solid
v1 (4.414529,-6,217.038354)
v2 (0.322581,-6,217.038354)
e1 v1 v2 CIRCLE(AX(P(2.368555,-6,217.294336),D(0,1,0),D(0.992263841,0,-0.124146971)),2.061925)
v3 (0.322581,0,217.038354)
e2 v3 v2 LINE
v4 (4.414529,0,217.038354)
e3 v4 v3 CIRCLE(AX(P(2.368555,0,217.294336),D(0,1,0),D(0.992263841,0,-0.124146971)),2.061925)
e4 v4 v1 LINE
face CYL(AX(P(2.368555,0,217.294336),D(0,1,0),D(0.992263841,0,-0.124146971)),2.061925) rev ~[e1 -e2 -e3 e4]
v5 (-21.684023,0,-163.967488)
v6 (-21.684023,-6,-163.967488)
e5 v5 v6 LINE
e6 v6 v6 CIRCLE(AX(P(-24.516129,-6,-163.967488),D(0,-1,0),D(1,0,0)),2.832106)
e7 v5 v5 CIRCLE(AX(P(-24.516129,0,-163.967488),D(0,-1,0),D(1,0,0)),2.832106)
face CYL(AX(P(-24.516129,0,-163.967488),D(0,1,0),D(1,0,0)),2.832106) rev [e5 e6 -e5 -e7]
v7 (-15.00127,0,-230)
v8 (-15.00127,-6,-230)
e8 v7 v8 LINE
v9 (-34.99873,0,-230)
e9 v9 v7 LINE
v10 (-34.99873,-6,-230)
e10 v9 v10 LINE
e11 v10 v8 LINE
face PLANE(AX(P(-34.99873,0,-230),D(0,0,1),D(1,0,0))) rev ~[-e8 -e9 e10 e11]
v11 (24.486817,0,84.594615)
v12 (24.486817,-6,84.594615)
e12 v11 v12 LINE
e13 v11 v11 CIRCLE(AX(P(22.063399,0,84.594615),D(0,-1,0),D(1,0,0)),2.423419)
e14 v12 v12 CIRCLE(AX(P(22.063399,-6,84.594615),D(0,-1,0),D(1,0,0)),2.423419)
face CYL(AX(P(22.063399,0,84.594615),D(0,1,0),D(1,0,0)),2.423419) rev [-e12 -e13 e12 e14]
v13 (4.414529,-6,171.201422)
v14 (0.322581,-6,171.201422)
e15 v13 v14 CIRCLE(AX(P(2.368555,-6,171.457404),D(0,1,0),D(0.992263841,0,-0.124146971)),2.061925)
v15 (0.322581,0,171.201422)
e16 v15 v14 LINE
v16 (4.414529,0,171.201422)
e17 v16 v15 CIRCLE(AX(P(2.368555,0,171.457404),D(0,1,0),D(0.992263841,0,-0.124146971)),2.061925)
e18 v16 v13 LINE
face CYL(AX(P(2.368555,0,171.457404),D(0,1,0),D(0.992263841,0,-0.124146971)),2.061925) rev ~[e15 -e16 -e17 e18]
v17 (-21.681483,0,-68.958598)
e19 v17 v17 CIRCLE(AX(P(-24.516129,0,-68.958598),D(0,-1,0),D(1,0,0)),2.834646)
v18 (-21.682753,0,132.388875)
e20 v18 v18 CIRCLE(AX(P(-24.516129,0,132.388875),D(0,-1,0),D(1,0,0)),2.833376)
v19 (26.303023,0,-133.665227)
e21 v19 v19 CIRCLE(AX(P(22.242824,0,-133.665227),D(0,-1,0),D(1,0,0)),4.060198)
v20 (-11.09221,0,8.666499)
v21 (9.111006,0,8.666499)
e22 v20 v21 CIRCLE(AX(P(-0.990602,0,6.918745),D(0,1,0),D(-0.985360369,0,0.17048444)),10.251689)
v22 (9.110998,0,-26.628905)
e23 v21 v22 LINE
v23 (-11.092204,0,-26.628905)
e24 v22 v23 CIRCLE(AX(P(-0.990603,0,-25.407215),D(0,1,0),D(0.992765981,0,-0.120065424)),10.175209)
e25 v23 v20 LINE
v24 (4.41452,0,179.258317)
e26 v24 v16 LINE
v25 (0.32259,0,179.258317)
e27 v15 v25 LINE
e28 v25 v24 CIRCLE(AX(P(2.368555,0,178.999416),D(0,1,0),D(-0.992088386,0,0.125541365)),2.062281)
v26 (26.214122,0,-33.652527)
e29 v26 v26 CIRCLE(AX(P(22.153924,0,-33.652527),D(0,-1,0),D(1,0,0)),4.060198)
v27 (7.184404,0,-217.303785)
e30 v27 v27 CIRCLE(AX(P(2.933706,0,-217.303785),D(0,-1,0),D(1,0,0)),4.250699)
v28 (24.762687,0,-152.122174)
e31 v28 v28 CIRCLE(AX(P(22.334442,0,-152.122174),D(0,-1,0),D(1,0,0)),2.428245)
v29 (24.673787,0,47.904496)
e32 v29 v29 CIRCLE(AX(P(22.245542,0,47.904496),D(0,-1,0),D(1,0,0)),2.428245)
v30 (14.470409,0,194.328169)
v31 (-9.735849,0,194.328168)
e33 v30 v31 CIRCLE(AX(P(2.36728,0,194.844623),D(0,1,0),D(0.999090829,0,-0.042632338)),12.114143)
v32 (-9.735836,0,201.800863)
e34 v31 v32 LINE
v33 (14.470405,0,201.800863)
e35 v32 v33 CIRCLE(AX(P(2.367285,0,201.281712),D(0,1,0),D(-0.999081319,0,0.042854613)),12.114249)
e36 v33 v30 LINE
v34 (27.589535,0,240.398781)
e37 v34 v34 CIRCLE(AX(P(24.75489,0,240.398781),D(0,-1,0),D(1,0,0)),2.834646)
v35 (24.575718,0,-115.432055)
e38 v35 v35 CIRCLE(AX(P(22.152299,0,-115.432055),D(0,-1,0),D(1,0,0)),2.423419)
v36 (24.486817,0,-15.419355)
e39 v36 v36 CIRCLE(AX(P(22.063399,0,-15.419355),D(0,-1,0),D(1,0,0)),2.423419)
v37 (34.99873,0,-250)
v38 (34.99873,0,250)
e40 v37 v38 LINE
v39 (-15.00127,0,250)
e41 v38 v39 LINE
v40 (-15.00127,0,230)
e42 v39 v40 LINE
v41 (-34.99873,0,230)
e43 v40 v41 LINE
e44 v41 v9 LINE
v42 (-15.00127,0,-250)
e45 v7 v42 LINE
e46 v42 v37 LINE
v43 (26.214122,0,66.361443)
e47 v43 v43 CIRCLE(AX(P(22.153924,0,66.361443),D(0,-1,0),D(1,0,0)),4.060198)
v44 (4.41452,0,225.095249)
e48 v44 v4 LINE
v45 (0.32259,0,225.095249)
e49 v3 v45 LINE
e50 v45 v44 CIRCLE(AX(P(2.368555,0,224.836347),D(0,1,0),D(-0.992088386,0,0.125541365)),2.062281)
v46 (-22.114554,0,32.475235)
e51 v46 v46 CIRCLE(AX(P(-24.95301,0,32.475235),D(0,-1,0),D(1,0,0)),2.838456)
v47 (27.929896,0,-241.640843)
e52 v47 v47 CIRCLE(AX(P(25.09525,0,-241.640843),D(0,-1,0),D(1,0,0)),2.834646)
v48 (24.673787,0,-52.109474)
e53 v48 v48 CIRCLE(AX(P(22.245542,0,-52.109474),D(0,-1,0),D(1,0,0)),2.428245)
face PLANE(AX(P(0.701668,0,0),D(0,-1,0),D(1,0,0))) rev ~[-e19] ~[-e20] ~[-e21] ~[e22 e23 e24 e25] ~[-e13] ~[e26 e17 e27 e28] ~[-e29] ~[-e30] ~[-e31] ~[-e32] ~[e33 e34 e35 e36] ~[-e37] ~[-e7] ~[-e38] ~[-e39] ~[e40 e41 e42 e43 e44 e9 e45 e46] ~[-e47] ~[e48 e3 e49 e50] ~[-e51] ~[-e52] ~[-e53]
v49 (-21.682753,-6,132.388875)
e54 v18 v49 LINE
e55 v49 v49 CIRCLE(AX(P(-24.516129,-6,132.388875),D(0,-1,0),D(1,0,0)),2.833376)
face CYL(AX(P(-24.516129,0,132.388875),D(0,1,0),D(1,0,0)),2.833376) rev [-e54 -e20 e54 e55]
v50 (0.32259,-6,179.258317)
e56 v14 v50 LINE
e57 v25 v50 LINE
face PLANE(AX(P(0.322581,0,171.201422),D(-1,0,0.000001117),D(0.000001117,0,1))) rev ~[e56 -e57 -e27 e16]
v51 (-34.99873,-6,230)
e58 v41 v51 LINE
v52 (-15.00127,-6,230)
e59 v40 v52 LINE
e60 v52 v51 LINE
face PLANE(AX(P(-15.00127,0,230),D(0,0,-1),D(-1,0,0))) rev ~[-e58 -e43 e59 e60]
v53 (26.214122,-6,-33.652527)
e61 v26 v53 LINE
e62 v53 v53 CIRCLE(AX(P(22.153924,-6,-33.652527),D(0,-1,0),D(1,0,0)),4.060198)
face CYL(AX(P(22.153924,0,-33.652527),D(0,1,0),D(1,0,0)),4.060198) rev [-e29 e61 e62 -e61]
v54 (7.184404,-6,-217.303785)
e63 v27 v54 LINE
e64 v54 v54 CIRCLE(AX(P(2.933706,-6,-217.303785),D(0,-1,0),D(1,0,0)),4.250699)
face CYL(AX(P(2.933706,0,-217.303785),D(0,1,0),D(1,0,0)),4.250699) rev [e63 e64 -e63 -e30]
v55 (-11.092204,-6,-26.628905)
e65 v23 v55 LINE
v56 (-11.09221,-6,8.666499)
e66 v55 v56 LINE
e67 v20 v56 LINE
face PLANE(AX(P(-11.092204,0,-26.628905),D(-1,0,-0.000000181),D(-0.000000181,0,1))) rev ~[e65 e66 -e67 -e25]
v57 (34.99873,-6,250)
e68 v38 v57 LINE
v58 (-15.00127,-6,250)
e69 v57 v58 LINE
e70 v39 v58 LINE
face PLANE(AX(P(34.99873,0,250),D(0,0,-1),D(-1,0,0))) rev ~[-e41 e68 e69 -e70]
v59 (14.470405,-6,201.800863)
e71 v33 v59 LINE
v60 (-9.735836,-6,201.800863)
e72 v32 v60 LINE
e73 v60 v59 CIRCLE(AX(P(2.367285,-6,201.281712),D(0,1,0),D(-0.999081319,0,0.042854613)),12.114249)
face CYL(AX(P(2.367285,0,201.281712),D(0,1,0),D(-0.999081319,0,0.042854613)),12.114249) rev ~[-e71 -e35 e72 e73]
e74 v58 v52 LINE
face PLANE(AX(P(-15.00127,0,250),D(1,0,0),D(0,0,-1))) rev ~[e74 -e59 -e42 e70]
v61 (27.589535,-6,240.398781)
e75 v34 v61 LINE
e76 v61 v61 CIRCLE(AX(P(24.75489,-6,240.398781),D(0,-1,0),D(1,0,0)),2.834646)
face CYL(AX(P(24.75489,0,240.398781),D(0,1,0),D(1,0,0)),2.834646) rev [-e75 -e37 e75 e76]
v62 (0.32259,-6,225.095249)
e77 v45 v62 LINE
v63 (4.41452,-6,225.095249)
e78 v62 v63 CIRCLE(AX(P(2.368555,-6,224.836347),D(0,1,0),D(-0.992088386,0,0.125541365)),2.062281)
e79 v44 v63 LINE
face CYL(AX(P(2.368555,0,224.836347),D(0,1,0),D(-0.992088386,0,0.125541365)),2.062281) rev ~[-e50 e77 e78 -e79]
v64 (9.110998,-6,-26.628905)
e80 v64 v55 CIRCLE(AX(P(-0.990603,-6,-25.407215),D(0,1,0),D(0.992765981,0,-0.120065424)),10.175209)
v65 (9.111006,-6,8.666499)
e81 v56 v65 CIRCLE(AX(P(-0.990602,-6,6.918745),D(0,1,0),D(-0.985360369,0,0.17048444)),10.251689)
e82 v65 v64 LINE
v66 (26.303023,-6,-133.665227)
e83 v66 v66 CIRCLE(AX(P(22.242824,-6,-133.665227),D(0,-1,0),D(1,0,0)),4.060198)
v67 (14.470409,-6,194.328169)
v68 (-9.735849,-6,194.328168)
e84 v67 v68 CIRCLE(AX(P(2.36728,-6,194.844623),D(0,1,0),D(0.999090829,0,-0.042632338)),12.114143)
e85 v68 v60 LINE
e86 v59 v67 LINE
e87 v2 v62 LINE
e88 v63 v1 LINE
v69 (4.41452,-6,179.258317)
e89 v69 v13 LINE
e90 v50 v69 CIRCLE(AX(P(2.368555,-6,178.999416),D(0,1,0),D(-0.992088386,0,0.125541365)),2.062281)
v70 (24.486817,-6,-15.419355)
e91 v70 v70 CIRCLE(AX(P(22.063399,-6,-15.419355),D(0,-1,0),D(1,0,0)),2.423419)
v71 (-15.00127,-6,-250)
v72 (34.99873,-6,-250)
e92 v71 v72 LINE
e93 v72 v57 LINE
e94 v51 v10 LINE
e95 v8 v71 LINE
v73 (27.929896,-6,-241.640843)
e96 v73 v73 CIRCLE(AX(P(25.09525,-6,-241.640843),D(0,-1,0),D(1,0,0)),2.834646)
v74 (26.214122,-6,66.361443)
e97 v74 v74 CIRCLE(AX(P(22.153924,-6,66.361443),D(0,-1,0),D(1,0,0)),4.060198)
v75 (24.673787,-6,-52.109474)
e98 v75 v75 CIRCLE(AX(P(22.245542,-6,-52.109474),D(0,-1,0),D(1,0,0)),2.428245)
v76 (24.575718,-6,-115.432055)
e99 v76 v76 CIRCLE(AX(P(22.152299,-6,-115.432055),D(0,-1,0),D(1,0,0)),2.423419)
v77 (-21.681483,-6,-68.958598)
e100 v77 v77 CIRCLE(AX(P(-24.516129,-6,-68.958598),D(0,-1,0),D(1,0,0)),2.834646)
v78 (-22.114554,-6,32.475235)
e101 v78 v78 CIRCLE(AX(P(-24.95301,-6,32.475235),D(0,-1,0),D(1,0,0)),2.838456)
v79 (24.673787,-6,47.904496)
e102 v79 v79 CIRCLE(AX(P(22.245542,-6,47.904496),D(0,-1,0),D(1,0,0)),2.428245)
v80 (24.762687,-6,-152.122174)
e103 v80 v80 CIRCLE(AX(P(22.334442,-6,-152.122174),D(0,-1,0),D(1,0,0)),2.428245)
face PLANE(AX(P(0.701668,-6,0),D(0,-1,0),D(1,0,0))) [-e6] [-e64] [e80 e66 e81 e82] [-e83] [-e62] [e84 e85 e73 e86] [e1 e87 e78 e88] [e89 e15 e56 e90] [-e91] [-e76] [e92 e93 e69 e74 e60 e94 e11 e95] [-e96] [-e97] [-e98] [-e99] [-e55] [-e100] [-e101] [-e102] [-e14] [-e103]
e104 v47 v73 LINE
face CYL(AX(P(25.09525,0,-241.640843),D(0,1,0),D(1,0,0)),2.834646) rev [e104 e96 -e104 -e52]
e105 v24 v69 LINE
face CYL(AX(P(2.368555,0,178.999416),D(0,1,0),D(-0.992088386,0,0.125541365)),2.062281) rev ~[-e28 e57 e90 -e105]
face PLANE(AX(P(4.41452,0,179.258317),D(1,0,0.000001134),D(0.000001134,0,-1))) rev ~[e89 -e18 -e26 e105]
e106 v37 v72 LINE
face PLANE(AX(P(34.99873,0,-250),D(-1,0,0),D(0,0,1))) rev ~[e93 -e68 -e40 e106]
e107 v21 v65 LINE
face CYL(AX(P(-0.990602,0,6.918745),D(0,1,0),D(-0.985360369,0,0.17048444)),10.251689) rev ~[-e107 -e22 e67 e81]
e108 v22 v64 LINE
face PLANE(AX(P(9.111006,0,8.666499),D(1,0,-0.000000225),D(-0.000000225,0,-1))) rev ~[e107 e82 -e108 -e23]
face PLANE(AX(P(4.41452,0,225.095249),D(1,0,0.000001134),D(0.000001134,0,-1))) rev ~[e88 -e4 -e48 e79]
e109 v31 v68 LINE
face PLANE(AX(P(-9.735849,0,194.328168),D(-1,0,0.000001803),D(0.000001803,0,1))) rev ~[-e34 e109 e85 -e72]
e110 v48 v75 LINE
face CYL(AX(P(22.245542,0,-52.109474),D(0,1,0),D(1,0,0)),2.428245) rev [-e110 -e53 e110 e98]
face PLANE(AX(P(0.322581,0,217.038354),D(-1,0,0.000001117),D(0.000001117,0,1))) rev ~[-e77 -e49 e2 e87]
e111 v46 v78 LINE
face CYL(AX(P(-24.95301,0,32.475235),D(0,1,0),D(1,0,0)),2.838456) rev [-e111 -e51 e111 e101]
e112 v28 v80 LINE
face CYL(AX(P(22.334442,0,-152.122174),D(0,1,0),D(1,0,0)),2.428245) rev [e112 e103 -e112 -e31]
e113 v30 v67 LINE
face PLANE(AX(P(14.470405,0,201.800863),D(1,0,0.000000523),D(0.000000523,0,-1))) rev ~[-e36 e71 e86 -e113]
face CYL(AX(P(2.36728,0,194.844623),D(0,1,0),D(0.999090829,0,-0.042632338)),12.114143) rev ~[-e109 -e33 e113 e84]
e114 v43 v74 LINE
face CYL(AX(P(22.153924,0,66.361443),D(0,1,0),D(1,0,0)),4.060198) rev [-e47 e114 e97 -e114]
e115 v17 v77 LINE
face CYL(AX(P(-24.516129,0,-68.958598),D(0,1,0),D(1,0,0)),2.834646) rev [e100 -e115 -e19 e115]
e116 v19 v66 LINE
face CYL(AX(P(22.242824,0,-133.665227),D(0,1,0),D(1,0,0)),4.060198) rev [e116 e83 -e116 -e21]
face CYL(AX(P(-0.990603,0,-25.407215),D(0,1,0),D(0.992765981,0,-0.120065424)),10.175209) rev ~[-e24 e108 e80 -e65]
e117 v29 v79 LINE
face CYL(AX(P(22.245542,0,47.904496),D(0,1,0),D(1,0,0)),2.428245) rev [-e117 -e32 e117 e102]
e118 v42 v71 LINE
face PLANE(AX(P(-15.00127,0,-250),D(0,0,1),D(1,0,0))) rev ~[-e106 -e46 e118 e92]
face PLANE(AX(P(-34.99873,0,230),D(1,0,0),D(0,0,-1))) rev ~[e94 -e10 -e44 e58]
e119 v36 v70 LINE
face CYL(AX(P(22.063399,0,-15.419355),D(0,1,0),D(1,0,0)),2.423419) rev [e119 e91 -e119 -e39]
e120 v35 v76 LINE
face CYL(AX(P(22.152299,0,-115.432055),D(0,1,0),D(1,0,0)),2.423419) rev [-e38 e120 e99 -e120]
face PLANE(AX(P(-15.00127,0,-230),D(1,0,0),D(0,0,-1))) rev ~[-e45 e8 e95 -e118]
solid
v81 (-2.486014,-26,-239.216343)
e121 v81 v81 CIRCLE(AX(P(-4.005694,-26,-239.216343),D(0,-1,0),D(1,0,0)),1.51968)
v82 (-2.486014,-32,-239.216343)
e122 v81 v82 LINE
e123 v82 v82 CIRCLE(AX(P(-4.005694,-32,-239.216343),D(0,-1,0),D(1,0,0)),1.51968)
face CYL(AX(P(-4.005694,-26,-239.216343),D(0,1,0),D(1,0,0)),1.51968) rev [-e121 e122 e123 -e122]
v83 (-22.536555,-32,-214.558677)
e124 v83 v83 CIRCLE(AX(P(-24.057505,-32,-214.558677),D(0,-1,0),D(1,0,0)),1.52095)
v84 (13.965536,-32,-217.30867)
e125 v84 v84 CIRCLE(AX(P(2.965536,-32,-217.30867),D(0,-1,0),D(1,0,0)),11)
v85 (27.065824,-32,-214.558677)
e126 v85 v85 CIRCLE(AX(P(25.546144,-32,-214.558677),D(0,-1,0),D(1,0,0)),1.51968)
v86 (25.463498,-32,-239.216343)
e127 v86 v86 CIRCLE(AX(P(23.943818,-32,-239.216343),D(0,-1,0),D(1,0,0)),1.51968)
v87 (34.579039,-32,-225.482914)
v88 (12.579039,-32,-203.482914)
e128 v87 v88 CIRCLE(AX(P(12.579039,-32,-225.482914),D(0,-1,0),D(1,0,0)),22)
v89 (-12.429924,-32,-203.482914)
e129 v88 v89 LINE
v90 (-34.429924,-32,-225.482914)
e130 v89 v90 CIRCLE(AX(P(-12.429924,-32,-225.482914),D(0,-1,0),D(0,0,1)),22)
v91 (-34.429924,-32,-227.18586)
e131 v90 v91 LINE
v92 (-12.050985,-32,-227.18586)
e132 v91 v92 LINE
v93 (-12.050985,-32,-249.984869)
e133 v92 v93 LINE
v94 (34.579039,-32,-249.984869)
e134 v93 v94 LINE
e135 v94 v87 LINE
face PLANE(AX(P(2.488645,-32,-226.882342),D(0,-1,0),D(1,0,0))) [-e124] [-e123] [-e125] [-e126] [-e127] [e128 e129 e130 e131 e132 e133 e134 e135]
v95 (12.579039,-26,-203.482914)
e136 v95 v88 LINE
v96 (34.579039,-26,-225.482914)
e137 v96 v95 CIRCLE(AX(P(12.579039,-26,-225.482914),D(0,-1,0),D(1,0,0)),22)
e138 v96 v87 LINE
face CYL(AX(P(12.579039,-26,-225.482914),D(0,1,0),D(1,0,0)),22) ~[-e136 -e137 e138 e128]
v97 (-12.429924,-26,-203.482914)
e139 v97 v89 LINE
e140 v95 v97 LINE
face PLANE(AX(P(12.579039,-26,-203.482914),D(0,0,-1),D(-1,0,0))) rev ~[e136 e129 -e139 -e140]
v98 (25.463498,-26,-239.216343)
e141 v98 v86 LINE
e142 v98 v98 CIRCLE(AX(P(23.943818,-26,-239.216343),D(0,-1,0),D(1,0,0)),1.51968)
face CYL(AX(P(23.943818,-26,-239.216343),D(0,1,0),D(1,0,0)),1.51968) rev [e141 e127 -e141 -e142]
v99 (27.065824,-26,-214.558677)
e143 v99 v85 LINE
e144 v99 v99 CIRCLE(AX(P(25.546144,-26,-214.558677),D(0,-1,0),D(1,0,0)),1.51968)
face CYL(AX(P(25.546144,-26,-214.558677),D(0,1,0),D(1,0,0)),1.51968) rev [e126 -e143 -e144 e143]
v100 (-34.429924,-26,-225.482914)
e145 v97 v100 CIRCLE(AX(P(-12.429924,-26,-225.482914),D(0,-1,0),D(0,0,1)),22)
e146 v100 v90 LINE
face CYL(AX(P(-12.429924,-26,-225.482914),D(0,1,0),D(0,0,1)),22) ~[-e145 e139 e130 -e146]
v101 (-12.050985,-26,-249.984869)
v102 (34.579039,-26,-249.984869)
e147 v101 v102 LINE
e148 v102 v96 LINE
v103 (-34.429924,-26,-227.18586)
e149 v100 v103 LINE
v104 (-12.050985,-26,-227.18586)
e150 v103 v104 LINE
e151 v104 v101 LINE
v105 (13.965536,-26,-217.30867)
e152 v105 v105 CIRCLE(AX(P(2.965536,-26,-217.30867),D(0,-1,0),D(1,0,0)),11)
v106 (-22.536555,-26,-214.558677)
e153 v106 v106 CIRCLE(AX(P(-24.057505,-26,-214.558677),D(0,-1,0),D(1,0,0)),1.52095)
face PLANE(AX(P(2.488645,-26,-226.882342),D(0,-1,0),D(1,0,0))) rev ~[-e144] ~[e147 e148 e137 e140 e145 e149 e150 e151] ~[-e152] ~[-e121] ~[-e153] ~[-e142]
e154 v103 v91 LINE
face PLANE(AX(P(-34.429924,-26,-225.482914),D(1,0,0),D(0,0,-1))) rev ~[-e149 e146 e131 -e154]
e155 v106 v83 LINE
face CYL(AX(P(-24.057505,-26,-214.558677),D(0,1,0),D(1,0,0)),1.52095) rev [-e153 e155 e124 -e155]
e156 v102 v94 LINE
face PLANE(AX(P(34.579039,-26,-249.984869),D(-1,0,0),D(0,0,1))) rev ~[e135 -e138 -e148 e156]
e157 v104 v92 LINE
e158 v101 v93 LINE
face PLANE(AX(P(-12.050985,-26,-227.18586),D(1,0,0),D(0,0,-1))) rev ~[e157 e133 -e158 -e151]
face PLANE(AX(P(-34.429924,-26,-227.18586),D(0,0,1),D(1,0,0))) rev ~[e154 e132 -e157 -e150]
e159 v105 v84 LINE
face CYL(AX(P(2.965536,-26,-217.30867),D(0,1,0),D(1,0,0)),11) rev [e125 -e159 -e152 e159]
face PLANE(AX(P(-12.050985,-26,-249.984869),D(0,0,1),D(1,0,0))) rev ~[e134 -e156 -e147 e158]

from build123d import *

# Parameters (mm, degrees)
F0_R     = 2.8321056642
F0_R_2   = 2.8346456693
F0_R_3   = 4.2506985014
F0_R_4   = 2.4282448565
F0_R_5   = 4.0601981204
F0_R_6   = 2.4234188468
F0_R_7   = 2.8384556769
F0_R_8   = 2.8333756668
F1_DEPTH = 6
F3_R     = 1.5196800403
F3_R_2   = 1.5209496142
F3_R_3   = 11
F4_DEPTH = 6


# Not quite as in the source:
# - ends of sketch curves that miss each other by under 0.0002 mm in the source are joined


with BuildPart() as f1:
    # F0 (on Front) → F1 (new body)
    with BuildSketch(Plane.XZ):
        Polygon((-15.0012700025, 250), (-15.0012700025, 230), (-34.9987299975, 230), (-34.9987299975, -230), (-15.0012700025, -230), (-15.0012700025, -250), (34.9987299975, -250), (34.9987299975, 250), align=None)
        with Locations((-24.5161290323, -163.967487935)):
            Circle(F0_R, mode=Mode.SUBTRACT)
        with Locations((-24.5161290323, -68.9585979172)):
            Circle(F0_R_2, mode=Mode.SUBTRACT)
        with BuildLine():
            ThreePointArc((-11.0922101342, 8.6664987085), (-0.9906019812, 17.1704343409), (9.1110061718, 8.6664987085))
            Line((9.1110061718, 8.6664987085), (9.110998222, -26.6289052578))
            ThreePointArc((9.110998222, -26.6289052578), (-0.9906019812, -35.5824231648), (-11.0922037581, -26.6289054481))
            Line((-11.0922037581, -26.6289054481), (-11.0922101342, 8.6664987085))
        make_face(mode=Mode.SUBTRACT)
        with Locations((2.9337058674, -217.3037846076)):
            Circle(F0_R_3, mode=Mode.SUBTRACT)
        with Locations((25.0952501905, -241.6408432817)):
            Circle(F0_R_2, mode=Mode.SUBTRACT)
        with Locations((22.3344424689, -152.1221742443)):
            Circle(F0_R_4, mode=Mode.SUBTRACT)
        with Locations((22.2428244856, -133.6652273305)):
            Circle(F0_R_5, mode=Mode.SUBTRACT)
        with Locations((22.1522987046, -115.4320548641)):
            Circle(F0_R_6, mode=Mode.SUBTRACT)
        with Locations((22.2455422911, -52.1094742189)):
            Circle(F0_R_4, mode=Mode.SUBTRACT)
        with Locations((22.1539243078, -33.6525273051)):
            Circle(F0_R_5, mode=Mode.SUBTRACT)
        with Locations((22.0633985268, -15.4193548387)):
            Circle(F0_R_6, mode=Mode.SUBTRACT)
        with Locations((-24.953009906, 32.4752349505)):
            Circle(F0_R_7, mode=Mode.SUBTRACT)
        with Locations((-24.5161290323, 132.3888747777)):
            Circle(F0_R_8, mode=Mode.SUBTRACT)
        with Locations((22.2455422911, 47.904495809)):
            Circle(F0_R_4, mode=Mode.SUBTRACT)
        with Locations((22.1539243078, 66.3614427229)):
            Circle(F0_R_5, mode=Mode.SUBTRACT)
        with Locations((22.0633985268, 84.5946151892)):
            Circle(F0_R_6, mode=Mode.SUBTRACT)
        with BuildLine():
            ThreePointArc((0.322589783, 179.2583173603), (2.3685547371, 181.0616967234), (4.4145196912, 179.2583173603))
            Line((4.4145196912, 179.2583173603), (4.4145288291, 171.2014224028))
            ThreePointArc((4.4145288291, 171.2014224028), (2.3685547371, 169.395478791), (0.3225807849, 171.2014224203))
            Line((0.3225807849, 171.2014224203), (0.322589783, 179.2583173603))
        make_face(mode=Mode.SUBTRACT)
        with BuildLine():
            ThreePointArc((-9.7358355642, 201.8008634341), (2.3672847346, 213.3959613919), (14.4704050333, 201.8008634341))
            Line((14.4704050333, 201.8008634341), (14.4704089408, 194.3281686563))
            ThreePointArc((14.4704089408, 194.3281686563), (2.3672847346, 182.730480061), (-9.735849035, 194.3281682483))
            Line((-9.735849035, 194.3281682483), (-9.7358355642, 201.8008634341))
        make_face(mode=Mode.SUBTRACT)
        with BuildLine():
            ThreePointArc((0.322589783, 225.0952490342), (2.3685547371, 226.8986283973), (4.4145196912, 225.0952490342))
            Line((4.4145196912, 225.0952490342), (4.4145288291, 217.0383540767))
            ThreePointArc((4.4145288291, 217.0383540767), (2.3685547371, 215.2324104648), (0.3225807849, 217.0383540942))
            Line((0.3225807849, 217.0383540942), (0.322589783, 225.0952490342))
        make_face(mode=Mode.SUBTRACT)
        with Locations((24.7548895098, 240.3987807976)):
            Circle(F0_R_2, mode=Mode.SUBTRACT)
    extrude(amount=F1_DEPTH)


with BuildPart() as f4:
    # F3 (on offset) → F4 (new body)
    with BuildSketch(Plane.XZ.offset(26)):
        with BuildLine():
            Line((-34.429923848, -225.4829136519), (-34.429923848, -227.1858596432))
            Line((-34.429923848, -227.1858596432), (-12.0509845344, -227.1858596432))
            Line((-12.0509845344, -227.1858596432), (-12.0509845344, -249.9848689689))
            Line((-12.0509845344, -249.9848689689), (34.579038782, -249.9848689689))
            Line((34.579038782, -249.9848689689), (34.579038782, -225.4829136519))
            ThreePointArc((34.579038782, -225.4829136519), (28.1353879681, -209.9265644658), (12.579038782, -203.4829136519))
            Line((12.579038782, -203.4829136519), (-12.429923848, -203.4829136519))
            ThreePointArc((-12.429923848, -203.4829136519), (-27.9862730341, -209.9265644658), (-34.429923848, -225.4829136519))
        make_face()
        with Locations((-4.0056942962, -239.2163425684)):
            Circle(F3_R, mode=Mode.SUBTRACT)
        with Locations((23.9438176482, -239.2163425684)):
            Circle(F3_R, mode=Mode.SUBTRACT)
        with Locations((-24.0575045256, -214.5586769528)):
            Circle(F3_R_2, mode=Mode.SUBTRACT)
        with Locations((2.9655364342, -217.3086702824)):
            Circle(F3_R_3, mode=Mode.SUBTRACT)
        with Locations((25.5461439863, -214.5586769528)):
            Circle(F3_R, mode=Mode.SUBTRACT)
    extrude(amount=F4_DEPTH)


solid = Compound([f1.part, f4.part])
